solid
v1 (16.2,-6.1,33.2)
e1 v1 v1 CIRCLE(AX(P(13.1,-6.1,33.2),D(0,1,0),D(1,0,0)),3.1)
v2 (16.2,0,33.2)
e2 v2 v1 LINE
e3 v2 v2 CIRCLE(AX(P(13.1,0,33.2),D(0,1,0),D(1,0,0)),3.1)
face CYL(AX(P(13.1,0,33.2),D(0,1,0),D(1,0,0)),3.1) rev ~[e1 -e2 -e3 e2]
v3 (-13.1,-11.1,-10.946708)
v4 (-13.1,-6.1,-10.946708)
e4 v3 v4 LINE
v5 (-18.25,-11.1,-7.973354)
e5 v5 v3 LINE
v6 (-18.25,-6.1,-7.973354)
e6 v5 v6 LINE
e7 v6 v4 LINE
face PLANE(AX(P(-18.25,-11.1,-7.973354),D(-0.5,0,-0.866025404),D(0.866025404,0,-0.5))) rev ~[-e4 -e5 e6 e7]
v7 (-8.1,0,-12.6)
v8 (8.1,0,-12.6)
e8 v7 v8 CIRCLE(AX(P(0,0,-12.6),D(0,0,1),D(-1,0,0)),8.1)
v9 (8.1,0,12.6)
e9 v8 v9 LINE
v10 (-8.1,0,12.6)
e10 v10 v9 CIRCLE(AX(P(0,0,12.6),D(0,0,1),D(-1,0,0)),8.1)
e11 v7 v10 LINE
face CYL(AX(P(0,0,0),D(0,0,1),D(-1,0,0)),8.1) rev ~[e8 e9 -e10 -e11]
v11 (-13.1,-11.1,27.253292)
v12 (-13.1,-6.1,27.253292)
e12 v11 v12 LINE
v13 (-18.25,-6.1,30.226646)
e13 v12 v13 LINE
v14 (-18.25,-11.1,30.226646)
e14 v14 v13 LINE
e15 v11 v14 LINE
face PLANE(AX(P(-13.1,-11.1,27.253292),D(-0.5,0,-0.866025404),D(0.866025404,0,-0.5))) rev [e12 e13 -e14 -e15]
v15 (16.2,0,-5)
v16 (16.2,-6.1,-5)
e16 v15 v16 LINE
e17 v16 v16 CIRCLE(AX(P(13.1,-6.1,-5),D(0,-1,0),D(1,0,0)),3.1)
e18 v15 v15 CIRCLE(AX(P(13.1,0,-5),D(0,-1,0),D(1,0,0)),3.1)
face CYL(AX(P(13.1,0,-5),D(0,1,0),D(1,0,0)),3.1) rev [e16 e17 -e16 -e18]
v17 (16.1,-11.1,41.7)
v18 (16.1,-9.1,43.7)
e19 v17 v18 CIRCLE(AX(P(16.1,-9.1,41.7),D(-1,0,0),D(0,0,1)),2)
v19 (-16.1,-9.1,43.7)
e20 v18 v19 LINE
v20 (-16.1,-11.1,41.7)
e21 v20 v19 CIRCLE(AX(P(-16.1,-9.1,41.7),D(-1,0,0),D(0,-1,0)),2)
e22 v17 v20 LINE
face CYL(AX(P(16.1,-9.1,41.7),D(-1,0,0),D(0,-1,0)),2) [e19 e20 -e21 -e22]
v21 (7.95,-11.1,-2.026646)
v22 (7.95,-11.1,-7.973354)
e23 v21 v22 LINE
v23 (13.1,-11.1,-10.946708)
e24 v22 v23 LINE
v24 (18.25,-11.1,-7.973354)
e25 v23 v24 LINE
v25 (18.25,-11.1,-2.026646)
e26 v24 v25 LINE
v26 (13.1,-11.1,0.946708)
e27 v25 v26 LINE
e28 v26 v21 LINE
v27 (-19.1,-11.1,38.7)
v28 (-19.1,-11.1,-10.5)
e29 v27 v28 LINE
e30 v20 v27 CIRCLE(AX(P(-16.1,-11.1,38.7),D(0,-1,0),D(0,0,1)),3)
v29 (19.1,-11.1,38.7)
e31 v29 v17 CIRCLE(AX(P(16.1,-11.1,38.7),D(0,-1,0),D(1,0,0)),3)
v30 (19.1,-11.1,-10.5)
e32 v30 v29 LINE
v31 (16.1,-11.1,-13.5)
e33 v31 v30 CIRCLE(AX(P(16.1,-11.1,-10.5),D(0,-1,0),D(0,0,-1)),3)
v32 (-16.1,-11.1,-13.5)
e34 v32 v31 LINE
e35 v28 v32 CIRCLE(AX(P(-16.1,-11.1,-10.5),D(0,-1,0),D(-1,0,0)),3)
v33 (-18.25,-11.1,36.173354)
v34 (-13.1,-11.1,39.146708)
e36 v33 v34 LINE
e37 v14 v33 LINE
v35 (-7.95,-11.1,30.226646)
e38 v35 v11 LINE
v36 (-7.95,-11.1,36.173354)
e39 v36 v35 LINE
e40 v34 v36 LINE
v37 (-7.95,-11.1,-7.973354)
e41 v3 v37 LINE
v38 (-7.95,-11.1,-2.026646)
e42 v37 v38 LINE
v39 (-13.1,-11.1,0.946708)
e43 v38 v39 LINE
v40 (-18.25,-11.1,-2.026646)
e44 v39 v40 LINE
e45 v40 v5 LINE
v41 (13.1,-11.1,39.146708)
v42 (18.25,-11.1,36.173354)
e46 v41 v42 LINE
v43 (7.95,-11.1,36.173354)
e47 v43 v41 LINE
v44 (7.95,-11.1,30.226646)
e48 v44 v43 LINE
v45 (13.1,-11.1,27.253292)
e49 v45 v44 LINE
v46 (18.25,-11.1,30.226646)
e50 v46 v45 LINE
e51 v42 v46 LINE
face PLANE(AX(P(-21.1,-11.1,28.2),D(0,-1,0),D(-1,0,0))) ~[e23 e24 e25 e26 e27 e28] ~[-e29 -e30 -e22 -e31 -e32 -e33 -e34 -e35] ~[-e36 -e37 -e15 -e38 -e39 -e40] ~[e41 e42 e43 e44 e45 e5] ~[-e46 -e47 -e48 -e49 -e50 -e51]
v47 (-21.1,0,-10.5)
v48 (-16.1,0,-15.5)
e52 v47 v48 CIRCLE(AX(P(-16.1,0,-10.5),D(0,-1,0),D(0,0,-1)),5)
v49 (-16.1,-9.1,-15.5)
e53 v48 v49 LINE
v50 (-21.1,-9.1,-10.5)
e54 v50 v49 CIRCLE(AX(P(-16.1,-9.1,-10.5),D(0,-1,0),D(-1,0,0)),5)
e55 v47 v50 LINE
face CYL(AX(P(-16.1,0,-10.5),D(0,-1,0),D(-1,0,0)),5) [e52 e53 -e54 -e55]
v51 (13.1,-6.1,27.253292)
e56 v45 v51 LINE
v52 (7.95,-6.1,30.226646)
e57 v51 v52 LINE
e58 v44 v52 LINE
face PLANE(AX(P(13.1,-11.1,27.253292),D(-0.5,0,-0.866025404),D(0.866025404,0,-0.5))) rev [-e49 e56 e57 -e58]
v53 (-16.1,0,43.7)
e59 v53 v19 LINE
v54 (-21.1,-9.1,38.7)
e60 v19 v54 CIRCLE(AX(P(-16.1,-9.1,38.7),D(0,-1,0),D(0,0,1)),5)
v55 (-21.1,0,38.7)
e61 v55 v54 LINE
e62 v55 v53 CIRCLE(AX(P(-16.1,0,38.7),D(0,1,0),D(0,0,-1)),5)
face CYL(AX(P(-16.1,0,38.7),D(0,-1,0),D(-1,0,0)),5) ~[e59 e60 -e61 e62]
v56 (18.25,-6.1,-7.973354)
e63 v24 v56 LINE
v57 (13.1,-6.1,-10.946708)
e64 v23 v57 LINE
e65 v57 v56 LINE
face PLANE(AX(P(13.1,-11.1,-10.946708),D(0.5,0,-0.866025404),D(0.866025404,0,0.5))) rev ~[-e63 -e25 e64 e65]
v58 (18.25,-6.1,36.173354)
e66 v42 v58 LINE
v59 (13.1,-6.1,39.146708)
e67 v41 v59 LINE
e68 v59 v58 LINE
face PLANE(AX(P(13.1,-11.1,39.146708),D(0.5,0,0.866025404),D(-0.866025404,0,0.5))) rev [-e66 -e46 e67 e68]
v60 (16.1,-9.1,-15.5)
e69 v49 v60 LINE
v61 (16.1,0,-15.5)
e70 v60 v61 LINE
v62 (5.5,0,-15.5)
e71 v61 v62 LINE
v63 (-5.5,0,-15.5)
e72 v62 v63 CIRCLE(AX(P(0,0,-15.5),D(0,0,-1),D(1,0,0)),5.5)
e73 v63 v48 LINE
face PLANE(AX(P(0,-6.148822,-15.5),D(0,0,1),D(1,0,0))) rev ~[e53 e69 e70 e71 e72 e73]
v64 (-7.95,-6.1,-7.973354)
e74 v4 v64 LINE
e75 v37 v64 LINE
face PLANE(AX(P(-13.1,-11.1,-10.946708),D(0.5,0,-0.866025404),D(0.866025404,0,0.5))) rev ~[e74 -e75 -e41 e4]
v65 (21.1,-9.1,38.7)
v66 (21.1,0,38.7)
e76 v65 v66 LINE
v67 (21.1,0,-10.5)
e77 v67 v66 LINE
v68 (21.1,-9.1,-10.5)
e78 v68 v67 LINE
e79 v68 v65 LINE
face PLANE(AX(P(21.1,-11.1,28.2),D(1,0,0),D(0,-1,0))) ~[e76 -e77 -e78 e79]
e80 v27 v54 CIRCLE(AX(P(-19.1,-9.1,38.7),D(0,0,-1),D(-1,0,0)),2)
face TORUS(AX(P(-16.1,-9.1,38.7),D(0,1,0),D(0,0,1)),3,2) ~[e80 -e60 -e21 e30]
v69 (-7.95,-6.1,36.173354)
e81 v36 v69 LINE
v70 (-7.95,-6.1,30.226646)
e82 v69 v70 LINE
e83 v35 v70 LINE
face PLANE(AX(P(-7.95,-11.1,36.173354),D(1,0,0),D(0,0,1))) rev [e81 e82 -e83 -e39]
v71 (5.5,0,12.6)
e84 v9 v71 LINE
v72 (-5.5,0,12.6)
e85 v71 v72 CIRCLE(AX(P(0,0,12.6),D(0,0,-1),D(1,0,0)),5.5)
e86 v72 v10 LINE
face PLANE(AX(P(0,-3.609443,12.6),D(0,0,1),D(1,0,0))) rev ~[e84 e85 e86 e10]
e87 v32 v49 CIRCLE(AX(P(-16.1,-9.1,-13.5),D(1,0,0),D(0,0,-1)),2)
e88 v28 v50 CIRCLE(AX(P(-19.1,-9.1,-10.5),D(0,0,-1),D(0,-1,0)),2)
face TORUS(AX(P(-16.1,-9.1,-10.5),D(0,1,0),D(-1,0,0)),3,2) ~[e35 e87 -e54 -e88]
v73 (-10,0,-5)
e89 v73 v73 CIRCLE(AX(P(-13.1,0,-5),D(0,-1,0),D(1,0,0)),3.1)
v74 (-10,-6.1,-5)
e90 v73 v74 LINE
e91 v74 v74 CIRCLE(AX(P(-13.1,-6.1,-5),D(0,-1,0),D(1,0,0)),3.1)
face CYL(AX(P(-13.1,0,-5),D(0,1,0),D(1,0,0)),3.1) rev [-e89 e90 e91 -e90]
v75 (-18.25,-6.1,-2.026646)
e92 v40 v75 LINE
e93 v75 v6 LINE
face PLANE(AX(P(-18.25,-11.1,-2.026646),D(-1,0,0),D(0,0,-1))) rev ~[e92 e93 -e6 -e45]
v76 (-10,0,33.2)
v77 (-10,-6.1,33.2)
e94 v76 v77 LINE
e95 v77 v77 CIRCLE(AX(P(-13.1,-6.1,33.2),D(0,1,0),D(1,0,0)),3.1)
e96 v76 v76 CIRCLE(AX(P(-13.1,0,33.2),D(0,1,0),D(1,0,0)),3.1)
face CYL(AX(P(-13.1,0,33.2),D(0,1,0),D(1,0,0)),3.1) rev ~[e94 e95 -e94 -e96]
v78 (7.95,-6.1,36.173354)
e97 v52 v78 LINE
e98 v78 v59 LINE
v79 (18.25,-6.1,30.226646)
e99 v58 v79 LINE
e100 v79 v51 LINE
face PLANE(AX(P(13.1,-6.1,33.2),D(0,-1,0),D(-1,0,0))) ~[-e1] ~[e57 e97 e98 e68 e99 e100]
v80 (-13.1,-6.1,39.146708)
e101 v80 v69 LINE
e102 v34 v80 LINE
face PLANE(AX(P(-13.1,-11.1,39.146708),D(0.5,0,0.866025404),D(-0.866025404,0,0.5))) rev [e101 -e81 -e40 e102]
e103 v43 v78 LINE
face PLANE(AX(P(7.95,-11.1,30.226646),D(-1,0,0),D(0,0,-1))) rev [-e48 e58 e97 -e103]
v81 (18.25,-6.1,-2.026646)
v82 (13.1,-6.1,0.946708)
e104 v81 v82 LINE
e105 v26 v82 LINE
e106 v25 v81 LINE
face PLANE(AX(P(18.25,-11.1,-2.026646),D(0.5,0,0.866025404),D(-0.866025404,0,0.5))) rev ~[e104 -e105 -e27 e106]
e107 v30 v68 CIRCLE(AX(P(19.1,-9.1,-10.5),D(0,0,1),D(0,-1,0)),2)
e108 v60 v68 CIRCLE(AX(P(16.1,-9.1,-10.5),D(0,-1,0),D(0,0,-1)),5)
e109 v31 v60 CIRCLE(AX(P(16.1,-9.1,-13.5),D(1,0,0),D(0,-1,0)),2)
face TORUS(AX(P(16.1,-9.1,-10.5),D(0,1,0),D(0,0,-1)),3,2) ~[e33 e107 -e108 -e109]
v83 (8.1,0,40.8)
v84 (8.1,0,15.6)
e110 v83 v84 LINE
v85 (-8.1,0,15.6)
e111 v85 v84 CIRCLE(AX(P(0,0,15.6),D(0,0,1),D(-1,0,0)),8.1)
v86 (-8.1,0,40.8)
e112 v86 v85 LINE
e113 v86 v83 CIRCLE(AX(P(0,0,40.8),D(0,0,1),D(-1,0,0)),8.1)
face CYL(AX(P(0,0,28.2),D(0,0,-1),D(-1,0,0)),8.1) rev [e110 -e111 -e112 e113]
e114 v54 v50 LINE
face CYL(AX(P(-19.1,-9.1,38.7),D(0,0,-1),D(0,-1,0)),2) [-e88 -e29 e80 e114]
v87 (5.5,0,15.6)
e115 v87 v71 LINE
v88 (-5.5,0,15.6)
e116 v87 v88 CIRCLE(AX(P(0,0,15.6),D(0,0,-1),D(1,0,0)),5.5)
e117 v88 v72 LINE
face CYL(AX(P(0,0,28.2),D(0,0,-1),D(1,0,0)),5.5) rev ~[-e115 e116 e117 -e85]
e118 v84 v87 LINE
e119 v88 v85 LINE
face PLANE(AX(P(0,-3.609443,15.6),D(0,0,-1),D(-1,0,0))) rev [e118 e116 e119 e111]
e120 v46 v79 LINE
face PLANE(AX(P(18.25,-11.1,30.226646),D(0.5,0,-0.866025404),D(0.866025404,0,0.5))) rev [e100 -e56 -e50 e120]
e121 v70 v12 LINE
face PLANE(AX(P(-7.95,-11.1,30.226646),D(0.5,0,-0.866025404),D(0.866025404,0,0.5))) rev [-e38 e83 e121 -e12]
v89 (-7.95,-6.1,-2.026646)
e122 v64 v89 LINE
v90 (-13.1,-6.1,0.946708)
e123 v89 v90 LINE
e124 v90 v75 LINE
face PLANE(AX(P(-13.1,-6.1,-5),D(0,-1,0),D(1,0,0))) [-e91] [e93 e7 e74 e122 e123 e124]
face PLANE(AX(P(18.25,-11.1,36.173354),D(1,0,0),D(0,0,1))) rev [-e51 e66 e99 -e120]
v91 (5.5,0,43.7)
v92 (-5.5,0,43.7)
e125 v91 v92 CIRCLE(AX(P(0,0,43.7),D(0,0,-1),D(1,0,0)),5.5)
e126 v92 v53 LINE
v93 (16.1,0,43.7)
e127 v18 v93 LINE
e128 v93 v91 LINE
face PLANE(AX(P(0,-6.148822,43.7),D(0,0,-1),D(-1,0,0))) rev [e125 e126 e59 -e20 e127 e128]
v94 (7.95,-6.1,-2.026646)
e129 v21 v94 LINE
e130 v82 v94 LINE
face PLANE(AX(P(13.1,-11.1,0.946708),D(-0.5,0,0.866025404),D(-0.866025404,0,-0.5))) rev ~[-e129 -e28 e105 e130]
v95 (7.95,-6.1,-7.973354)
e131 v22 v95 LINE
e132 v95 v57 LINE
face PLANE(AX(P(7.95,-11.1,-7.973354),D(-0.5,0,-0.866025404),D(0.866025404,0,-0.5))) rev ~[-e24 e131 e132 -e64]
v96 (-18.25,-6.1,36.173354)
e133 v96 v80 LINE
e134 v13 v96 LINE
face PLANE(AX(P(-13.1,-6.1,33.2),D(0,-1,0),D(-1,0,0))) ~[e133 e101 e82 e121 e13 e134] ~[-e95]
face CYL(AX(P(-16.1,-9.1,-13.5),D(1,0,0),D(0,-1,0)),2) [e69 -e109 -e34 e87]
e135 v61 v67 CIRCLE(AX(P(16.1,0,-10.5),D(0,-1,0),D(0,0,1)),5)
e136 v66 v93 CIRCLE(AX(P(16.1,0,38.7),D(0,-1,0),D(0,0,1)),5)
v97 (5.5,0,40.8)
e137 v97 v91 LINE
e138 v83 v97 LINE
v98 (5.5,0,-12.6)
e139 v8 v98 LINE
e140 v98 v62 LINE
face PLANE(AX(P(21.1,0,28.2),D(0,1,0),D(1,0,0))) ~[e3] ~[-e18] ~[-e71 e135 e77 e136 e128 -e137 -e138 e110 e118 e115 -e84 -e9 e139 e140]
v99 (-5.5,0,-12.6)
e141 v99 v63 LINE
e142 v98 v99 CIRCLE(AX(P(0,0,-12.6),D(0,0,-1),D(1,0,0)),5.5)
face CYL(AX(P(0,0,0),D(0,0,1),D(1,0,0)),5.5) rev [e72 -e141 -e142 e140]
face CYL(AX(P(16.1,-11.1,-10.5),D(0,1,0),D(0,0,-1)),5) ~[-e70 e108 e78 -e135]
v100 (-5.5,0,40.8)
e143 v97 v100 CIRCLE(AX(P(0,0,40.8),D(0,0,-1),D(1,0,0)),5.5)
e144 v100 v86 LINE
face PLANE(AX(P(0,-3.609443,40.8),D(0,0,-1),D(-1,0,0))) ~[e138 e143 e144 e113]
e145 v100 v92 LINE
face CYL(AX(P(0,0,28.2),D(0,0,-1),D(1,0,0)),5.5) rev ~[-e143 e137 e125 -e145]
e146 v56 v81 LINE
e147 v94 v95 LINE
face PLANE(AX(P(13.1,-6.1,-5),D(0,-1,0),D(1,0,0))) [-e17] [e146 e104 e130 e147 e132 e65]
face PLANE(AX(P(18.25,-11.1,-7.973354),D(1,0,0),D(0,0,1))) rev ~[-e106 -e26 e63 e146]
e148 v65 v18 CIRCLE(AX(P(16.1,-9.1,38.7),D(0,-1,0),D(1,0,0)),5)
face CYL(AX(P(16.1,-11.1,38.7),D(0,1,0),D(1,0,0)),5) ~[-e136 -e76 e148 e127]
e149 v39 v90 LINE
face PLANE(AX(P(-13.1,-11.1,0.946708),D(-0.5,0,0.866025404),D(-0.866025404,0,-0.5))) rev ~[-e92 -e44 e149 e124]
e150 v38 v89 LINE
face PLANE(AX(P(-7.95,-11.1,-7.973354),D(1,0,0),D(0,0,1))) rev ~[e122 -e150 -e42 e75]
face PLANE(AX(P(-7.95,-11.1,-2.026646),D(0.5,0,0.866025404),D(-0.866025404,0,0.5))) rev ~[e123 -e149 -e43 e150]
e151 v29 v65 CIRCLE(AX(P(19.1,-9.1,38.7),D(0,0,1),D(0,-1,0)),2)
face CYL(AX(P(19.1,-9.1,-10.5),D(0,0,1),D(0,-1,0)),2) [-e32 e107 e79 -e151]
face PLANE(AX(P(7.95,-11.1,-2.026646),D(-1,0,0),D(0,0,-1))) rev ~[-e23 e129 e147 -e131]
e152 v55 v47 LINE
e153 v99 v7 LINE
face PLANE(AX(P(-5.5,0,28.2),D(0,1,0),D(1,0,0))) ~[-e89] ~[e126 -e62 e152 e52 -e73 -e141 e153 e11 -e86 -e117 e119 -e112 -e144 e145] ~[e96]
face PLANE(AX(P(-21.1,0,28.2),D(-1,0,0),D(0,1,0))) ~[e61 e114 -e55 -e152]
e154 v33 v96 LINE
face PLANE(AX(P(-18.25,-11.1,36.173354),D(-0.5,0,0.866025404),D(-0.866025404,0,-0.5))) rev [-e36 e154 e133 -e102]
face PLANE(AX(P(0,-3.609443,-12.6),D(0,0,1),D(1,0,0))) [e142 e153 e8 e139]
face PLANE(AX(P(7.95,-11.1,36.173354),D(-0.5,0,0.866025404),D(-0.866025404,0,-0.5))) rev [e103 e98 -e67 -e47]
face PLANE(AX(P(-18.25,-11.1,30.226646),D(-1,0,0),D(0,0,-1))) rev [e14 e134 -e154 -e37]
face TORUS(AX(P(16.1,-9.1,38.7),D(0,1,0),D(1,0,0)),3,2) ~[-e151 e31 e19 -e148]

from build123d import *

# Parameters (mm, degrees)
F1_DEPTH = 15.5
F2_DEPTH = 12.6
F3_R     = 3.1
F4_DEPTH = 11.101
F6_R     = 3.1
F7_DEPTH = 5
F9_R     = 5
F10_R    = 2


# Not quite as in the source:
# - a feature names something its author has since deleted; it is built from what else it names


with BuildPart() as f1:
    # F0 (on Top) → F1 (new body, symmetric)
    with BuildSketch(Plane.XY):
        with BuildLine():
            Line((-8.1, 0), (-21.1, 0))
            Line((-21.1, 0), (-21.1, -11.1))
            Line((-21.1, -11.1), (21.1, -11.1))
            Line((21.1, -11.1), (21.1, 0))
            Line((21.1, 0), (8.1, 0))
            ThreePointArc((8.1, 0), (0, -8.1), (-8.1, 0))
        make_face()
        with BuildLine():
            Line((-5.5, 0), (-8.1, 0))
            ThreePointArc((-8.1, 0), (0, -8.1), (8.1, 0))
            Line((8.1, 0), (5.5, 0))
            ThreePointArc((5.5, 0), (0, -5.5), (-5.5, 0))
        make_face()
    extrude(amount=F1_DEPTH, both=True)

    # F0 (on Top) → F2 (cut, symmetric)
    with BuildSketch(Plane.XY):
        with BuildLine():
            Line((-5.5, 0), (-8.1, 0))
            ThreePointArc((-8.1, 0), (0, -8.1), (8.1, 0))
            Line((8.1, 0), (5.5, 0))
            ThreePointArc((5.5, 0), (0, -5.5), (-5.5, 0))
        make_face()
    extrude(amount=F2_DEPTH, both=True, mode=Mode.SUBTRACT)

    # F3 (on Front) → F4 (cut, through all)
    with BuildSketch(Plane.XZ):
        with Locations((13.1, -5)):
            Circle(F3_R)
        with Locations((-13.1, -5)):
            Circle(F3_R)
    extrude(amount=F4_DEPTH, mode=Mode.SUBTRACT)

    # F6 (on face) → F7 (cut)
    with BuildSketch(Plane.XZ.offset(11.1)):
        Polygon((7.95, -2.0266461137), (7.95, -7.9733538863), (13.1, -10.9467077727), (18.25, -7.9733538863), (18.25, -2.0266461137), (13.1, 0.9467077727), align=None)
        with Locations((13.1, -5)):
            Circle(F6_R, mode=Mode.SUBTRACT)
        Polygon((-18.25, -7.9733538863), (-13.1, -10.9467077727), (-7.95, -7.9733538863), (-7.95, -2.0266461137), (-13.1, 0.9467077727), (-18.25, -2.0266461137), align=None)
        with Locations((-13.1, -5)):
            Circle(F6_R, mode=Mode.SUBTRACT)
    extrude(amount=-F7_DEPTH, mode=Mode.SUBTRACT)

    # F8: F1 across plane


with BuildPart() as f1_1:
    add(f1.part)
    add(f1.part.mirror(Plane(origin=(0, -5.9130296111, 14.1), x_dir=(1, 0, 0), z_dir=(0, 0, 1))))

    # F9
    f9_edges = [f1_1.edges().sort_by_distance(p)[0] for p in [
        (21.1, -5.55, 43.7),
        (21.1, -5.55, -15.5),
        (-21.1, -5.55, -15.5),
        (-21.1, -5.55, 43.7),
    ]]
    fillet(f9_edges, radius=F9_R)

    # F10
    f10_edges = [f1_1.edges().sort_by_distance(p)[0] for p in [
        (21.1, -11.1, 14.1),
        (19.635534, -11.1, -14.035534),
        (-21.1, -11.1, 14.1),
        (-19.635534, -11.1, -14.035534),
        (-19.635534, -11.1, 42.235534),
        (0, -11.1, -15.5),
        (0, -11.1, 43.7),
        (19.635534, -11.1, 42.235534),
    ]]
    fillet(f10_edges, radius=F10_R)


solid = f1_1.part
